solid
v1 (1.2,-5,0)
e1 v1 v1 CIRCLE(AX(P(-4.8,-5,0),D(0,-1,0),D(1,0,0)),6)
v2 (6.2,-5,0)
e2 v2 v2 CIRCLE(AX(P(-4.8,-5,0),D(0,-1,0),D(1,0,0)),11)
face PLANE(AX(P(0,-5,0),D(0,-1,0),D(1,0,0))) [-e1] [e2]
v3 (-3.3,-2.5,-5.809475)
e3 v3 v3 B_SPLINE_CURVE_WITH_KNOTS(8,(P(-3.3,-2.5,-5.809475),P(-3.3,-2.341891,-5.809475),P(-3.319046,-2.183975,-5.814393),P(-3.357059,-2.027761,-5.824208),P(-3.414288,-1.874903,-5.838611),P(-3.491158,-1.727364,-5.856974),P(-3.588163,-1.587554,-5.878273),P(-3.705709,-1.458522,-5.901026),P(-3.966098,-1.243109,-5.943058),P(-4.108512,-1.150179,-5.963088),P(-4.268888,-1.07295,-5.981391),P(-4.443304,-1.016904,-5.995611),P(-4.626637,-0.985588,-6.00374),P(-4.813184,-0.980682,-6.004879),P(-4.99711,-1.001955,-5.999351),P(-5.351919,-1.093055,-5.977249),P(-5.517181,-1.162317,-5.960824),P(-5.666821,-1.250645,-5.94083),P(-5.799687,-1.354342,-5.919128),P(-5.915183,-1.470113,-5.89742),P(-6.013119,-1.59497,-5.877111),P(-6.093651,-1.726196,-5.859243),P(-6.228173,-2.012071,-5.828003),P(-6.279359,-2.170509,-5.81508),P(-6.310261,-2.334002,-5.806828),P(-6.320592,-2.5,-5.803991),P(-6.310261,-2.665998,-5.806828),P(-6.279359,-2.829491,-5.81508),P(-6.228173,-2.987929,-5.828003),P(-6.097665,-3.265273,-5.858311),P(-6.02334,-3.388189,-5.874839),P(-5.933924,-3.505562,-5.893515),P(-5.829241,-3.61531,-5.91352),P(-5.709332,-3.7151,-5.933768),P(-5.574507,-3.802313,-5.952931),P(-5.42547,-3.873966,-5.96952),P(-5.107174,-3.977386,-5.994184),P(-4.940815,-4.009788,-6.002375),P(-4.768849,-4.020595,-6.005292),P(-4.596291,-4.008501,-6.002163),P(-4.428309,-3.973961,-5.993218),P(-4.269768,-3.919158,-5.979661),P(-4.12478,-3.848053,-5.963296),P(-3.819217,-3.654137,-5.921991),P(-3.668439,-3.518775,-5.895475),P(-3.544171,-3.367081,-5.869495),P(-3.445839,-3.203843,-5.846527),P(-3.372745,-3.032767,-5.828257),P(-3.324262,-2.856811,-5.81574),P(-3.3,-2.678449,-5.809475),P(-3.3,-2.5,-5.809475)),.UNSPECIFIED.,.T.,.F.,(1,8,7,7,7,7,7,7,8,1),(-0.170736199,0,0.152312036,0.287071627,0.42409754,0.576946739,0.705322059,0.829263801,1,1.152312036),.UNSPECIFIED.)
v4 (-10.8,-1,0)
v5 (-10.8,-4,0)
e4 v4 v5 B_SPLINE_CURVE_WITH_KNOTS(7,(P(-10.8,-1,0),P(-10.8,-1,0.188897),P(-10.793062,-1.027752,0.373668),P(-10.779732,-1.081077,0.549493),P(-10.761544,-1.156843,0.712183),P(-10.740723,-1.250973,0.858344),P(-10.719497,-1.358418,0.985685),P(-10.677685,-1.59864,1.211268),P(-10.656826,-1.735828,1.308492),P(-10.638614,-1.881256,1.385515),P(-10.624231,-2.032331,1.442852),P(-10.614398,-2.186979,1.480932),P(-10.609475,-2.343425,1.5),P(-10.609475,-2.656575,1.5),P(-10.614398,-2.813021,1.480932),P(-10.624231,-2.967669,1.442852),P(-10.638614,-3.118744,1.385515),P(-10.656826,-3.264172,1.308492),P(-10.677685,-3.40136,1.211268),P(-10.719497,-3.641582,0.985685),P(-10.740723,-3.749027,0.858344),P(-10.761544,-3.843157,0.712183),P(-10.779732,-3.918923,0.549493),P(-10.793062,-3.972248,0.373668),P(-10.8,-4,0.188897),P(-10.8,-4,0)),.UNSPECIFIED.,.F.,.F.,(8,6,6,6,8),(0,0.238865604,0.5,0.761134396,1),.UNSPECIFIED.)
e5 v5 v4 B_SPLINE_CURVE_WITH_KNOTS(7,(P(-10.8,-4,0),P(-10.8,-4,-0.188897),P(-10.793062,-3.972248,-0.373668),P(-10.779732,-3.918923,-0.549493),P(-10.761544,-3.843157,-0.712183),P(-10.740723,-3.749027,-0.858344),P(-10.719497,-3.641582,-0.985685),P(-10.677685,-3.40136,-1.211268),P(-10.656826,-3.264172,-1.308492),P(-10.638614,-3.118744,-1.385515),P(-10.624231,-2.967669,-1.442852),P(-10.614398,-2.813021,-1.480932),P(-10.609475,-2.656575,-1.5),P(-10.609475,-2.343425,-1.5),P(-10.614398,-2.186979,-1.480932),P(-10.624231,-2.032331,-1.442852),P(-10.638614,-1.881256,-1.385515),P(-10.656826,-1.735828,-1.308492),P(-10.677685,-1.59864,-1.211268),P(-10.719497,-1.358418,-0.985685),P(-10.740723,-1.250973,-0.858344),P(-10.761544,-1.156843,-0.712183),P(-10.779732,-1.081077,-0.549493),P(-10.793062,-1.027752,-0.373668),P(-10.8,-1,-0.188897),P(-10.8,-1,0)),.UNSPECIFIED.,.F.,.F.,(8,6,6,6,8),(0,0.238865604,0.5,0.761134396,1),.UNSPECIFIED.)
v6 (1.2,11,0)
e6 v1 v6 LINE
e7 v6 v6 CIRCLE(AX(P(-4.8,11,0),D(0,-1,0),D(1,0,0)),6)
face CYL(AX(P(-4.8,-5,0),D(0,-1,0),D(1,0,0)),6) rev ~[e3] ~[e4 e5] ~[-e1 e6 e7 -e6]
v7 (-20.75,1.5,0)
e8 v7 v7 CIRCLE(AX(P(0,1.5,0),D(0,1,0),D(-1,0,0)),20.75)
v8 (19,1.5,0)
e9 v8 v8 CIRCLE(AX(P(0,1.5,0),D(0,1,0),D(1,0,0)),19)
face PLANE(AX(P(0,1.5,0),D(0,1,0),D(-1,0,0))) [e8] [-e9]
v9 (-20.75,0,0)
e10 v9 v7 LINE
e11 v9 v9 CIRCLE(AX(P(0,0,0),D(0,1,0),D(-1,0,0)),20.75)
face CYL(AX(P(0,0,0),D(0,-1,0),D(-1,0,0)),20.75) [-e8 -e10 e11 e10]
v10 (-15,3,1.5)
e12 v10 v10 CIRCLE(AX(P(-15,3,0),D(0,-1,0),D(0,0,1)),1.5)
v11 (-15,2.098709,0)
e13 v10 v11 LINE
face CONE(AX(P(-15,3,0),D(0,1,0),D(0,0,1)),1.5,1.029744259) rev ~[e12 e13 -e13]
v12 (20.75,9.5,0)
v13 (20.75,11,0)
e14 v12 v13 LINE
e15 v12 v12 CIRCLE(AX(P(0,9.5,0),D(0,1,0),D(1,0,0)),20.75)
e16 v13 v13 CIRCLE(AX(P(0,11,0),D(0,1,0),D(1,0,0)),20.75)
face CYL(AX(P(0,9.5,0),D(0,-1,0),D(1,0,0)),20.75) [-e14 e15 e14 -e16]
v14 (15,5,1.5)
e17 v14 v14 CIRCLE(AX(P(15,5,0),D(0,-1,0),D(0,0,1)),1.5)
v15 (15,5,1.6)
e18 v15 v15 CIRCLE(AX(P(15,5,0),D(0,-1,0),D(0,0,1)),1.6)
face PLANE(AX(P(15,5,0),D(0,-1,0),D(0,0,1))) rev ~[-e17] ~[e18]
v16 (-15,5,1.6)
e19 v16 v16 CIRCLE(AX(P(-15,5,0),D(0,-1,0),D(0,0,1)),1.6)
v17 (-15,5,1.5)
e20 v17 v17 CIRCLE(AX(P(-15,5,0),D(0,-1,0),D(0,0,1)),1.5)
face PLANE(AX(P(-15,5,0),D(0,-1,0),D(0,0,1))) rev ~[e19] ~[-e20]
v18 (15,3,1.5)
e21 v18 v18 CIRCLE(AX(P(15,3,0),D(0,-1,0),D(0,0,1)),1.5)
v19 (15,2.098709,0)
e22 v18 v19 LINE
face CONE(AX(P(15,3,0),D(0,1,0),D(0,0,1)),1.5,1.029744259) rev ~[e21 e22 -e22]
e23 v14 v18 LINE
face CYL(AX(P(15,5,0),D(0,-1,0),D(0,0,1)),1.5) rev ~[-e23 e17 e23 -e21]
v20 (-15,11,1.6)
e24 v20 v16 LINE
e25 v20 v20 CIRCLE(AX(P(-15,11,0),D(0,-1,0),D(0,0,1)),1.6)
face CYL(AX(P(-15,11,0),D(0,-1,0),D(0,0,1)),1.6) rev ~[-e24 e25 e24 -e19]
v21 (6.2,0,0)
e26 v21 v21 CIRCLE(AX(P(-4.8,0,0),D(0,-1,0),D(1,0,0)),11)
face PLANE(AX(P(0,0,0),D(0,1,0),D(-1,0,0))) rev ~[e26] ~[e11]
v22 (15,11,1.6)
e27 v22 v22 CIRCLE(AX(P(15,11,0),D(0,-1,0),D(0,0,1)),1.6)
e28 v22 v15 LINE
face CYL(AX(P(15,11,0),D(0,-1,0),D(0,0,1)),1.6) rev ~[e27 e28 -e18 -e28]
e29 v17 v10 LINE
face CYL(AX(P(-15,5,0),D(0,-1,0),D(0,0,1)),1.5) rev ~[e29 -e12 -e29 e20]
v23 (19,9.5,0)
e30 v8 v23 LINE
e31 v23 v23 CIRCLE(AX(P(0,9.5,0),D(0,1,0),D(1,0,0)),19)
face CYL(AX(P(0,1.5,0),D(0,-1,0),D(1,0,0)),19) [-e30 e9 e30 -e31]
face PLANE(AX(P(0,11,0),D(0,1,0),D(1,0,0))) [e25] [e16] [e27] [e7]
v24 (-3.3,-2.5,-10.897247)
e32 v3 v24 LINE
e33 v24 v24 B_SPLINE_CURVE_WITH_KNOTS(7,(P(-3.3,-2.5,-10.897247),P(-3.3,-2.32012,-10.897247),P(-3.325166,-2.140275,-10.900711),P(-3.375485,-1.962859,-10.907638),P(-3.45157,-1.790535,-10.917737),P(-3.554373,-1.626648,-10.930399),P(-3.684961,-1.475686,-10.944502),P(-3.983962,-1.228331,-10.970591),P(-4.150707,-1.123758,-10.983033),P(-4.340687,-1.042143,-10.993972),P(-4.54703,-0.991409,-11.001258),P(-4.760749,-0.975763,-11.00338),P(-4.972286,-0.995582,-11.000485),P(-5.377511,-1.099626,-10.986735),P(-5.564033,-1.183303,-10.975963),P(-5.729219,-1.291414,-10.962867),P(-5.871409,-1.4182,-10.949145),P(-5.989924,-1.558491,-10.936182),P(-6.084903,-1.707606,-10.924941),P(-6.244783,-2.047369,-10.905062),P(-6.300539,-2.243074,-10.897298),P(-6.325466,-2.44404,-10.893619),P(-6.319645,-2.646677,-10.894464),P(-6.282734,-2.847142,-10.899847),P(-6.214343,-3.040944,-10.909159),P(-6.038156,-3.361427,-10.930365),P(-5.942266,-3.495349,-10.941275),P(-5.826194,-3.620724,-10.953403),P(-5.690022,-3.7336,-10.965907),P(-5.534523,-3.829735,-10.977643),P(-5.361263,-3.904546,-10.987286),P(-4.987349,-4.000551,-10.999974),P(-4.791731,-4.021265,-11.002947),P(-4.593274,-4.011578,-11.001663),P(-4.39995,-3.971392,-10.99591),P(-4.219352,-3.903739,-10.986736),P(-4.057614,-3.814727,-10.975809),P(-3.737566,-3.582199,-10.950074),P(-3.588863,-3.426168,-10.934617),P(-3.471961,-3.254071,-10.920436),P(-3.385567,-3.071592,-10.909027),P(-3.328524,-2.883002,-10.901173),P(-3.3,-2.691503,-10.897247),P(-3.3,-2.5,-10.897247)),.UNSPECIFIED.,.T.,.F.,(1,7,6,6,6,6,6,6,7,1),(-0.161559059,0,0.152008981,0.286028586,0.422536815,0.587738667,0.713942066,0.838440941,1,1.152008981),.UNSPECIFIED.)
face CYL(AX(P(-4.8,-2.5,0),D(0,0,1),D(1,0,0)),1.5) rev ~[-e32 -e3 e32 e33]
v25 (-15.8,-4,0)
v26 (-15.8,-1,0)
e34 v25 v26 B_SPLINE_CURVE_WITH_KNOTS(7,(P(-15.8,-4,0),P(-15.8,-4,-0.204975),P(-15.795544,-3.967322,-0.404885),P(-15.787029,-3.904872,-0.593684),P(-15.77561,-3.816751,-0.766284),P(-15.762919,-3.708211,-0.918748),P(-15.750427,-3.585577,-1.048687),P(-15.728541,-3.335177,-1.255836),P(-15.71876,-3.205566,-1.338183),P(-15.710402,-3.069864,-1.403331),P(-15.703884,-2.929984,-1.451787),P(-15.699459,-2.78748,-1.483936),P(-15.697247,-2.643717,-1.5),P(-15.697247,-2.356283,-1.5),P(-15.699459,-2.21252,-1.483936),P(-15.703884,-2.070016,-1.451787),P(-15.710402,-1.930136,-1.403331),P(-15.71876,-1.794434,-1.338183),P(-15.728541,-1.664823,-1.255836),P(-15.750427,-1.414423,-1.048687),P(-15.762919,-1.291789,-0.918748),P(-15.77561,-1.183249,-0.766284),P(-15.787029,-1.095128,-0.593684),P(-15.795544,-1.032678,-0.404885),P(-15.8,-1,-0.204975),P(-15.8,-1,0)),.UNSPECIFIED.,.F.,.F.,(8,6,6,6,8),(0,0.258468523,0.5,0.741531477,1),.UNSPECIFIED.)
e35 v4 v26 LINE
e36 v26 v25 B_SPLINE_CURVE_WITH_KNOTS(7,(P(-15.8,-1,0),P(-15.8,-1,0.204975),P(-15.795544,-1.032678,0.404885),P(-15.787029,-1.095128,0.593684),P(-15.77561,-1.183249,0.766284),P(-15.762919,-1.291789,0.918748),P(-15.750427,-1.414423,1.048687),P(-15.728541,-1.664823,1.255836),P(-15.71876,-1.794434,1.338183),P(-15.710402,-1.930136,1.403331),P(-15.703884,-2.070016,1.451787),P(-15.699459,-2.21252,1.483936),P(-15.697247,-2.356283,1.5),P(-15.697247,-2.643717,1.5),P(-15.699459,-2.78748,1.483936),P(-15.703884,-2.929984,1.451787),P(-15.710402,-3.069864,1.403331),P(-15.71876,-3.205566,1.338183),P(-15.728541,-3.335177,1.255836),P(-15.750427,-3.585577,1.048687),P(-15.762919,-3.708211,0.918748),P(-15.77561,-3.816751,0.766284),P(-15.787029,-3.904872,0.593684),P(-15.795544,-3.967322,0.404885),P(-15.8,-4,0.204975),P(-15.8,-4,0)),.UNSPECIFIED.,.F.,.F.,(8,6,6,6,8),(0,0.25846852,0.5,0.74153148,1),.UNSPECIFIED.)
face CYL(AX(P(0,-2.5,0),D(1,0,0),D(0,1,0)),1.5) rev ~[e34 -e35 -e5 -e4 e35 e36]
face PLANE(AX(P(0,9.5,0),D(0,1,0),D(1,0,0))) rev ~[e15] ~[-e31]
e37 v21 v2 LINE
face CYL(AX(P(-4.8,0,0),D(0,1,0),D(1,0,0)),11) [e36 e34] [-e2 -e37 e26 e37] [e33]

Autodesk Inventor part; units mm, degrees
ref_plane "YZ Plane" through (0, 0, 0) normal (1, 0, 0) x (0, 1, 0)
ref_plane "XZ Plane" through (0, 0, 0) normal (0, 1, 0) x (-1, 0, 0)
ref_plane "XY Plane" through (0, 0, 0) normal (0, 0, 1) x (1, 0, 0)
sketch "Sketch1" plane through (0, 0, 0) normal (0, 1, 0) x (-1, 0, 0)
  circle A0 centre (0, 0) radius 20.75
  dimension "d0" = 41.5
extrude "Extrusion1" add sketch "Sketch1" along normal blind 1.5
sketch "Sketch2" plane through (0, 1.5, 0) normal (0, 1, 0) x (1, 0, 0)
  circle A0 centre (0, 0) radius 19
  dimension "d3" = 38
extrude "Extrusion2" add sketch "Sketch2" along normal blind 8
sketch "Sketch3" plane through (0, 9.5, 0) normal (0, 1, 0) x (1, 0, 0)
  circle A0 centre (0, 0) radius 20.75
extrude "Extrusion3" add sketch "Sketch3" along normal blind 1.5
sketch "Sketch4" plane through (0, 11, 0) normal (0, 1, 0) x (1, 0, 0)
  line L0 (0, 0) -> (-15, 0)
  circle A0 centre (-15, 0) radius 1.6
  line L1 (0, 0) -> (15, 0)
  circle A1 centre (15, 0) radius 1.6
  dimension "d8" = 15
  dimension "d9" = 3.2
  dimension "d10" = 15
hole "Hole1" at (-15, 11, 0) at (15, 11, 0) direction (0, -1, 0) diameter 3 depth 8 tip angle 118 counterbore diameter 3.2 counterbore depth 6
sketch "Sketch5" plane through (0, 0, 0) normal (0, -1, 0) x (1, 0, 0)
  line L0 (0, 0) -> (-4.8, 0)
  circle A0 centre (-4.8, 0) radius 11
  dimension "d18" = 4.8
  dimension "d19" = 22
extrude "Extrusion4" add sketch "Sketch5" along normal blind 5
sketch "Sketch6" plane through (-4.8, -5, 0) normal (0, -1, 0) x (1, 0, 0)
  circle A0 centre (0, 0) radius 6
  point P0 (4.8, 0)
  dimension "d22" = 12
extrude "Extrusion5" cut sketch "Sketch6" against normal through all
sketch "Sketch8" plane through (0, 0, 0) normal (1, 0, 0) x (0, 1, 0)
  line L0 (-5, -6) -> (-5, 6) projected
  line L1 (-5, 0) -> (-2.5, 0)
  circle A0 centre (-2.5, 0) radius 1.5
  point P0 (0, 0)
  dimension "d25" = 2.5
  dimension "d26" = 3
extrude "Extrusion6" cut sketch "Sketch8" against normal through all
sketch "Sketch9" plane through (0, 0, 0) normal (0, 0, 1) x (1, 0, 0)
  line L0 (6.2, 0) -> (6.2, -5) projected
  line L1 (6.2, -2.5) -> (-4.8, -2.5)
  circle A0 centre (-4.8, -2.5) radius 1.5
  point P0 (0, 0)
  dimension "d29" = 11
  dimension "d30" = 3
extrude "Extrusion7" cut sketch "Sketch9" against normal through all
properties part number "Assieme eccentrico"
